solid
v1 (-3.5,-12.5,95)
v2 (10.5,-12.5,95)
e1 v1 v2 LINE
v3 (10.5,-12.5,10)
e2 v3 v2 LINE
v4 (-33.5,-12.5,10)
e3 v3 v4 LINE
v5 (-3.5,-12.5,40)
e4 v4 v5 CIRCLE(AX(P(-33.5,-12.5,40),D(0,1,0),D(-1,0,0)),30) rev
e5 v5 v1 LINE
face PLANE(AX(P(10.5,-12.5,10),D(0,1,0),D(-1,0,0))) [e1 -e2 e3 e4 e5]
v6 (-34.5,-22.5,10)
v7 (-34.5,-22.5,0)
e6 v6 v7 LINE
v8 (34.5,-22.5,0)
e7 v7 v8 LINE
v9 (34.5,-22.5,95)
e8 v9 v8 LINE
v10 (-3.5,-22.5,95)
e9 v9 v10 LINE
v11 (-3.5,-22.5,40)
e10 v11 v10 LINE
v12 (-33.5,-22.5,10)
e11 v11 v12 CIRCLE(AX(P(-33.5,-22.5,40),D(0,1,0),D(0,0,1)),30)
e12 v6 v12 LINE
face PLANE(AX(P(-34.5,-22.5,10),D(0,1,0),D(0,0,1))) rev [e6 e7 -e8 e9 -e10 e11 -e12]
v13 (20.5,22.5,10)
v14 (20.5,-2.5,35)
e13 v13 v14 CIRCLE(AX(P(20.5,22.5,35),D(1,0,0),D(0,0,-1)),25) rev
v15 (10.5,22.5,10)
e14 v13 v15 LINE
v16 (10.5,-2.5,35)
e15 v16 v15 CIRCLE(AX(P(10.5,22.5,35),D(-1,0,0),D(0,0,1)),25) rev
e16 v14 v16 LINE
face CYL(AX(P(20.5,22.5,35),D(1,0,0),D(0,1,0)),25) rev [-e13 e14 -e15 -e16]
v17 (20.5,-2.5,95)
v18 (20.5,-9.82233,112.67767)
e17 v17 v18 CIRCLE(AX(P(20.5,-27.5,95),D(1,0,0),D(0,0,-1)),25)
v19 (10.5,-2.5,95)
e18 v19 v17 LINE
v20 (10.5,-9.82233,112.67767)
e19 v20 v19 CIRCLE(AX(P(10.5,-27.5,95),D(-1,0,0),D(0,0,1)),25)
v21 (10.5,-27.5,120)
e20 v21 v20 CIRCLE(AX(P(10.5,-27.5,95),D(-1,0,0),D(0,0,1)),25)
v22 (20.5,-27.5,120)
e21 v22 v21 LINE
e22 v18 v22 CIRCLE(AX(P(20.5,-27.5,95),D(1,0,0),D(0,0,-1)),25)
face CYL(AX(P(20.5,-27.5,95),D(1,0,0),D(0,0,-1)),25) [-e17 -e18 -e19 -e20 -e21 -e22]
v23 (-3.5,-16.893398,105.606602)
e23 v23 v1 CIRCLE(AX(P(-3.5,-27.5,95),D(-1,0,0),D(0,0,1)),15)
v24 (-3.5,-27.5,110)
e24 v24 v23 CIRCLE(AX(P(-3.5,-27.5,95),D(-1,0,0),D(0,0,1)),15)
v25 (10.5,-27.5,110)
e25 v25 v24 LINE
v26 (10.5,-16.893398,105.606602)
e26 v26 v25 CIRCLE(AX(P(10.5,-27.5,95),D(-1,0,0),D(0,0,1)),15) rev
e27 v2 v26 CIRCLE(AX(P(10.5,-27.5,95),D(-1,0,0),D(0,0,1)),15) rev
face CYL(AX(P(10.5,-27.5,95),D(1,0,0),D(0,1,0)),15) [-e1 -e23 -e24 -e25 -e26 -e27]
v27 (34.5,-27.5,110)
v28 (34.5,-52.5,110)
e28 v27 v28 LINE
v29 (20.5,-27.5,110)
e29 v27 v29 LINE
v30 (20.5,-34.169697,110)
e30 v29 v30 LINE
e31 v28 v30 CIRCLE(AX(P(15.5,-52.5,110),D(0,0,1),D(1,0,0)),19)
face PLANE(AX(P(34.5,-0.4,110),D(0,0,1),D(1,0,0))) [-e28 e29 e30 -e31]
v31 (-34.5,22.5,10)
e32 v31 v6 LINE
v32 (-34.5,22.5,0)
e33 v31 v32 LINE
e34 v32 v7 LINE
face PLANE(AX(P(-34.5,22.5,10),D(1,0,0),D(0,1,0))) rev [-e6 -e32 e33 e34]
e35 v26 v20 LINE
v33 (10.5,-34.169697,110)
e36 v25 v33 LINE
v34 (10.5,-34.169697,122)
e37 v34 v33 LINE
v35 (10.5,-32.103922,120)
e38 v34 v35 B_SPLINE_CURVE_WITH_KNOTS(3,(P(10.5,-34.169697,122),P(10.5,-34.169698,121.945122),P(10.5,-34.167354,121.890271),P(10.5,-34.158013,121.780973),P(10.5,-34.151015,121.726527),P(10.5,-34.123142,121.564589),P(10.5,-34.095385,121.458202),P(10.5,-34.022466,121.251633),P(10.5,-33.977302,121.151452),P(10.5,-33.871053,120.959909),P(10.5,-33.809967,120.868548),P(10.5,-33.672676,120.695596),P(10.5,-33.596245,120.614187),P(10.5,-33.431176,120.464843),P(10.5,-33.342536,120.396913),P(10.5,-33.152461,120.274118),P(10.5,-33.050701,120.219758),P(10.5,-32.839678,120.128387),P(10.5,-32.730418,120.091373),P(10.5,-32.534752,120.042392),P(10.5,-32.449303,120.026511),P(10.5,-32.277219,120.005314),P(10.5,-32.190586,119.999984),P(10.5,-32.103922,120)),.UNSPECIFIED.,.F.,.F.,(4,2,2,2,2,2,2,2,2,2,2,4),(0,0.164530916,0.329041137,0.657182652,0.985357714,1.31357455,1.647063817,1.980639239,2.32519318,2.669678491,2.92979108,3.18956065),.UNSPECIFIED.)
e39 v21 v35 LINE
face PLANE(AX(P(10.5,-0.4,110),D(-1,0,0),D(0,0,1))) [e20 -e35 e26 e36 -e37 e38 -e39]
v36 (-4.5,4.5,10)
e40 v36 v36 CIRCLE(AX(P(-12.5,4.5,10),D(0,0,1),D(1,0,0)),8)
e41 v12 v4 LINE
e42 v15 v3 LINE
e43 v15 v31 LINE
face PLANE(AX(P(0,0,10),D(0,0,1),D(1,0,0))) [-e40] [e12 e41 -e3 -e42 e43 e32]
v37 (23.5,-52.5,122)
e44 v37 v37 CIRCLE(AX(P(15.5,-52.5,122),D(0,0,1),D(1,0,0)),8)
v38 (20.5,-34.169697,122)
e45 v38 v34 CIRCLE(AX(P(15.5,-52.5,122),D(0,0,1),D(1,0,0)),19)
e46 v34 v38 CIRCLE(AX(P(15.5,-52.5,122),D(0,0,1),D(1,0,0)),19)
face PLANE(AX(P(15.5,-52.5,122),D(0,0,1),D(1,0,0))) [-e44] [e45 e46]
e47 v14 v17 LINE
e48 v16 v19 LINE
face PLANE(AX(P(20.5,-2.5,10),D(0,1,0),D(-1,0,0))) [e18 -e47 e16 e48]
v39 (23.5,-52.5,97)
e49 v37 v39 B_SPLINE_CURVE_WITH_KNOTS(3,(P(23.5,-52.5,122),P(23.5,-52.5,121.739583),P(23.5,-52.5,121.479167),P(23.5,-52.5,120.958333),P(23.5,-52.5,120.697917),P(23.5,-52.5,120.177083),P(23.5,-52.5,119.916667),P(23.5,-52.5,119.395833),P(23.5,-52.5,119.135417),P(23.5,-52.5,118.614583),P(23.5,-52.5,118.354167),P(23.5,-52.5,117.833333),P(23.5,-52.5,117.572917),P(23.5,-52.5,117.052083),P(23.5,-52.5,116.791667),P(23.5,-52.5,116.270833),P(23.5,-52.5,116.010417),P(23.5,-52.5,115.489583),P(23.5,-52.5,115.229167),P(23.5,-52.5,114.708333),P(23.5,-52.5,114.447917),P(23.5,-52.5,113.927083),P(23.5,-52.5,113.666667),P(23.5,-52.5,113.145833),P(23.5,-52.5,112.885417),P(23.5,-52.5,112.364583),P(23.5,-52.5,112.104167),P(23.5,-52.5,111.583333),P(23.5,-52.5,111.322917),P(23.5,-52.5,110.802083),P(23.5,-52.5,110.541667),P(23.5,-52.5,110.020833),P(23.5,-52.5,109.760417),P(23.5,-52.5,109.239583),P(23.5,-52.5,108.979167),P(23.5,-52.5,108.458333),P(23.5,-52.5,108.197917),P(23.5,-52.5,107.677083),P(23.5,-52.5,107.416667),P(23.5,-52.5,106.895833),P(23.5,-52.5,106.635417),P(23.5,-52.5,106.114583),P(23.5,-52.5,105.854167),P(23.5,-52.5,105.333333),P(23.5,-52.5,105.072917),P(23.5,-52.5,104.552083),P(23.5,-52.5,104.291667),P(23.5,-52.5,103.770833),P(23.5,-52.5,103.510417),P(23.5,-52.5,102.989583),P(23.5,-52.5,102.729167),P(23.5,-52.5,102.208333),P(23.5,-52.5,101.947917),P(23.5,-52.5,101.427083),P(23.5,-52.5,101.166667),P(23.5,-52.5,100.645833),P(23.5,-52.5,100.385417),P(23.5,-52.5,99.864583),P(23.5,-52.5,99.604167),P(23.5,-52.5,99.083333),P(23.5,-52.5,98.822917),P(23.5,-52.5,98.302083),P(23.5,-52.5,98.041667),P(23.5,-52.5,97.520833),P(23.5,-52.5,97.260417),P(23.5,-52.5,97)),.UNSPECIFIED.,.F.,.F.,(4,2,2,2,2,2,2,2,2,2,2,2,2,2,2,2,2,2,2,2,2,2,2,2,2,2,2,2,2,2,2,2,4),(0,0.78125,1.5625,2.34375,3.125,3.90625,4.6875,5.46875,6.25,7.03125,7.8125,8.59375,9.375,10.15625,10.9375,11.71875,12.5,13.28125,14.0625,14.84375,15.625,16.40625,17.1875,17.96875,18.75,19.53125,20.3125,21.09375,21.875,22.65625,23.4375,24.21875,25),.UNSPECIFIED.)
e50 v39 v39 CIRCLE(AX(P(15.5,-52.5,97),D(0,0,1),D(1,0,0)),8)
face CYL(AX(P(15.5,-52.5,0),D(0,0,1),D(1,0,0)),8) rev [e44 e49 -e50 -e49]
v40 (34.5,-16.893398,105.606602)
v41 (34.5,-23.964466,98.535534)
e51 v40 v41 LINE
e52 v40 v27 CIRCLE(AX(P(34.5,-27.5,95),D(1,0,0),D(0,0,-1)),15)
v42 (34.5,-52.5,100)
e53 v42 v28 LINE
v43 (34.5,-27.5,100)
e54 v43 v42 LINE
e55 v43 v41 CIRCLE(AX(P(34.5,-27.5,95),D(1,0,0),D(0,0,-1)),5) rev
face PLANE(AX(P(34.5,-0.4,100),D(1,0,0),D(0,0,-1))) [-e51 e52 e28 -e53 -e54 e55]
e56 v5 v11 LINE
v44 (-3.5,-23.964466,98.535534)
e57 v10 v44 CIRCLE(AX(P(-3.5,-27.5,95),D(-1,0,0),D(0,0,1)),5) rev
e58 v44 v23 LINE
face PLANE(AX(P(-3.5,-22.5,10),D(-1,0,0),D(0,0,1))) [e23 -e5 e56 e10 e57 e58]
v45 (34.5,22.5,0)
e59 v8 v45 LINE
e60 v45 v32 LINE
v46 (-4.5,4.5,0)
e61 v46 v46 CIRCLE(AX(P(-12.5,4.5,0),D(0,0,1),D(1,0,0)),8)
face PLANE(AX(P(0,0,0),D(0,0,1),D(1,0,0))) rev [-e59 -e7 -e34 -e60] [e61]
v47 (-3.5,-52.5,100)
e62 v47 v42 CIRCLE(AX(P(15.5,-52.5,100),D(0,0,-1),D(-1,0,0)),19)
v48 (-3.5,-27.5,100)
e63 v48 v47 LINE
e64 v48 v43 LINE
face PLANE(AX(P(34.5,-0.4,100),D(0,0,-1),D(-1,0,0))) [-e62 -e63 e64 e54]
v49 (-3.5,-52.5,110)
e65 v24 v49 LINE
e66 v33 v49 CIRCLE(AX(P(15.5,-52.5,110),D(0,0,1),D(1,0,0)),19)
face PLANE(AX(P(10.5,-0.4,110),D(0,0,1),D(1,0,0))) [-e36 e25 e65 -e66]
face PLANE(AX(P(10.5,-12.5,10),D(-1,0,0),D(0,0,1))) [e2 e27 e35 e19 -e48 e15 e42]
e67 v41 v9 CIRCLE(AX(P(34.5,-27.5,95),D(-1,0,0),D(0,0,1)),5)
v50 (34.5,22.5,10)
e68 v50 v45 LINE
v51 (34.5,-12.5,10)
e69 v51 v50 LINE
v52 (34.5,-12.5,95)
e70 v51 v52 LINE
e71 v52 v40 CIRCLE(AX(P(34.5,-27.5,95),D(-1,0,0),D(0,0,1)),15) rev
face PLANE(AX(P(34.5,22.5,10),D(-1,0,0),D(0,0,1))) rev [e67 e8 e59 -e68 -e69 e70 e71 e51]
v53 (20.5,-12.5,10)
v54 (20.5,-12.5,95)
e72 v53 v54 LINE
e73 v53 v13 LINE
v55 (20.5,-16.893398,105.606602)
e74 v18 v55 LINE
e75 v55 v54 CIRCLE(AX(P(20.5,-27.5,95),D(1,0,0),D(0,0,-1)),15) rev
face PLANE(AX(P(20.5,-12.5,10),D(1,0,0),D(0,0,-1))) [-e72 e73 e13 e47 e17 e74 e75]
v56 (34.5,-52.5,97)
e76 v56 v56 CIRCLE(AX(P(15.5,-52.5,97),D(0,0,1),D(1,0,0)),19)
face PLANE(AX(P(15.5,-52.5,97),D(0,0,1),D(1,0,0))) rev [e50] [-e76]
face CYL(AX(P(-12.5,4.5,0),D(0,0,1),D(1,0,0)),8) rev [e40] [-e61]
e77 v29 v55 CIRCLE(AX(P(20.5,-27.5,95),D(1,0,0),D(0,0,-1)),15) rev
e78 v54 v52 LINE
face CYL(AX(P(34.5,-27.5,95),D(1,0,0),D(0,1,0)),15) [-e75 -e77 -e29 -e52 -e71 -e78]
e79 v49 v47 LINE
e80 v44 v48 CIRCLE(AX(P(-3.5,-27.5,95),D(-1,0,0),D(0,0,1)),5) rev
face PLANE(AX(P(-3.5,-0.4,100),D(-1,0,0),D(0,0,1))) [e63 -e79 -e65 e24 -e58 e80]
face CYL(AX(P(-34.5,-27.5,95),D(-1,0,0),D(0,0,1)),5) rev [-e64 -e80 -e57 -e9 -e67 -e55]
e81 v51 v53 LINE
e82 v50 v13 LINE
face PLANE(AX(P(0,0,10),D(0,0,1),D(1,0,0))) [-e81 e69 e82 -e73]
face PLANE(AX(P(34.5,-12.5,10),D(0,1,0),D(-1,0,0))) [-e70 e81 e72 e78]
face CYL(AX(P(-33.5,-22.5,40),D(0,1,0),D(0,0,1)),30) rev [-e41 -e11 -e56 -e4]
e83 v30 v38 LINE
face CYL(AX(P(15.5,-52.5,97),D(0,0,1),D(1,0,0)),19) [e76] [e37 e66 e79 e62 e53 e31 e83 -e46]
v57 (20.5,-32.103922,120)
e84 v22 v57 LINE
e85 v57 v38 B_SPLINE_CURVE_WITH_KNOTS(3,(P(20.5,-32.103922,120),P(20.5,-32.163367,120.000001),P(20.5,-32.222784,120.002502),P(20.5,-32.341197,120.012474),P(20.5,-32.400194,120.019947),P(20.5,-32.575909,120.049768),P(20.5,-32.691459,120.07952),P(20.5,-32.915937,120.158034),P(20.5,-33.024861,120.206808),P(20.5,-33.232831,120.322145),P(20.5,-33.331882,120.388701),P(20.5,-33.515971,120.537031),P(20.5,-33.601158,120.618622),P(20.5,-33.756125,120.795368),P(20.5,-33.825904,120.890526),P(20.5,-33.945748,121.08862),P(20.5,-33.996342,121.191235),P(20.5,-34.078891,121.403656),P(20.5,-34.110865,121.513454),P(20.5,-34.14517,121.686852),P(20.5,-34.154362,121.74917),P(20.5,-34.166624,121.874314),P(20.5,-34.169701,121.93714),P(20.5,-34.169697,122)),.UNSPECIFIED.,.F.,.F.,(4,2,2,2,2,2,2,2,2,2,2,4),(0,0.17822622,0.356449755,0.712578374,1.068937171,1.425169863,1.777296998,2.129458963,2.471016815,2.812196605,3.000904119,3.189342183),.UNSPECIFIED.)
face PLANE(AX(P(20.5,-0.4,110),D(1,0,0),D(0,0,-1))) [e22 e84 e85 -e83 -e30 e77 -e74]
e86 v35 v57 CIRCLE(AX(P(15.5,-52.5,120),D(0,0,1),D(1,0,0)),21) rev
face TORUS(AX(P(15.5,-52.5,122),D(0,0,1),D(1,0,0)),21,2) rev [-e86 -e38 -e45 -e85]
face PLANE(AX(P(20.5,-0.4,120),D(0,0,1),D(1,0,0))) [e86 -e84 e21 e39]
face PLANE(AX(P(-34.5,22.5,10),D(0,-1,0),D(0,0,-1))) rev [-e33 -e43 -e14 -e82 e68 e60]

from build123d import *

# Parameters (mm, degrees)
SKETCH1_W                = 69
SKETCH1_H                = 45
BOSS_EXTRUDE1_DEPTH      = 10
BOSS_EXTRUDE2_DEPTH      = 12
BOSS_EXTRUDE2_DEPTH_BACK = 13
SKETCH5_R                = 19
SKETCH6_R                = 8
CUT_EXTRUDE1_DEPTH       = 146.555831213
FILLET1_R                = 25
FILLET2_R                = 15
FILLET3_R                = 5
FILLET4_R                = 2
FILLET5_R                = 25
FILLET6_R                = 30
SKETCH7_R                = 8
CUT_EXTRUDE2_DEPTH       = 138.282555338


with BuildPart() as part:
    # Sketch1 → Boss-Extrude1 (new body)
    with BuildSketch(Plane.XY):
        Rectangle(SKETCH1_W, SKETCH1_H)
    extrude(amount=BOSS_EXTRUDE1_DEPTH)

    # Sweep1: sweep along a path in Sketch3
    with BuildLine(Plane(origin=(15.5, 0, 0), x_dir=(0, 0, -1), z_dir=(1, 0, 0))) as sweep1_path:
        Line((-10, -22.5), (-100, -22.5))
        Line((-100, -22.5), (-100, -52.5))
    # Sketch4 → Sweep1 (sweep)
    with BuildSketch(Plane.XY.offset(10)):
        Polygon((34.5, -22.5), (-3.5, -22.5), (-3.5, -12.5), (10.5, -12.5), (10.5, -2.5), (20.5, -2.5), (20.5, -12.5), (34.5, -12.5), align=None)
    sweep(path=sweep1_path.line, transition=Transition.RIGHT)

    # Sketch5 → Boss-Extrude2 (add, two sides: drawn at the far end of the back side and taken through both)
    with BuildSketch(Plane.XY.offset(110).offset(-BOSS_EXTRUDE2_DEPTH_BACK)):
        with Locations((15.5, -52.5)):
            Circle(SKETCH5_R)
    extrude(amount=BOSS_EXTRUDE2_DEPTH + BOSS_EXTRUDE2_DEPTH_BACK)

    # Sketch6 → Cut-Extrude1 (cut, through all)
    with BuildSketch(Plane.XY.offset(122)):
        with Locations((15.5, -52.5)):
            Circle(SKETCH6_R)
    extrude(amount=-CUT_EXTRUDE1_DEPTH, mode=Mode.SUBTRACT)

    # Fillet1
    fillet1_edges = [part.edges().sort_by_distance(p)[0] for p in [
        (15.5, -2.5, 120),
    ]]
    fillet(fillet1_edges, radius=FILLET1_R)

    # Fillet2
    fillet2_edges = [part.edges().sort_by_distance(p)[0] for p in [
        (3.5, -12.5, 110),
        (27.5, -12.5, 110),
    ]]
    fillet(fillet2_edges, radius=FILLET2_R)

    # Fillet3
    fillet3_edges = [part.edges().sort_by_distance(p)[0] for p in [
        (15.5, -22.5, 100),
    ]]
    fillet(fillet3_edges, radius=FILLET3_R)

    # Fillet4
    fillet4_edges = [part.edges().sort_by_distance(p)[0] for p in [
        (15.5, -33.5, 120),
    ]]
    fillet(fillet4_edges, radius=FILLET4_R - 0.0001)  # a hair under: the kernel refuses the full size

    # Fillet5
    fillet5_edges = [part.edges().sort_by_distance(p)[0] for p in [
        (15.5, -2.5, 10),
    ]]
    fillet(fillet5_edges, radius=FILLET5_R - 0.0001)  # a hair under: the kernel refuses the full size

    # Fillet6
    fillet6_edges = [part.edges().sort_by_distance(p)[0] for p in [
        (-3.5, -17.5, 10),
    ]]
    fillet(fillet6_edges, radius=FILLET6_R)

    # Sketch7 → Cut-Extrude2 (cut, through all)
    with BuildSketch(Plane.XY.offset(10)):
        with Locations((-12.5, 4.5)):
            Circle(SKETCH7_R)
    extrude(amount=-CUT_EXTRUDE2_DEPTH, mode=Mode.SUBTRACT)


solid = part.part
